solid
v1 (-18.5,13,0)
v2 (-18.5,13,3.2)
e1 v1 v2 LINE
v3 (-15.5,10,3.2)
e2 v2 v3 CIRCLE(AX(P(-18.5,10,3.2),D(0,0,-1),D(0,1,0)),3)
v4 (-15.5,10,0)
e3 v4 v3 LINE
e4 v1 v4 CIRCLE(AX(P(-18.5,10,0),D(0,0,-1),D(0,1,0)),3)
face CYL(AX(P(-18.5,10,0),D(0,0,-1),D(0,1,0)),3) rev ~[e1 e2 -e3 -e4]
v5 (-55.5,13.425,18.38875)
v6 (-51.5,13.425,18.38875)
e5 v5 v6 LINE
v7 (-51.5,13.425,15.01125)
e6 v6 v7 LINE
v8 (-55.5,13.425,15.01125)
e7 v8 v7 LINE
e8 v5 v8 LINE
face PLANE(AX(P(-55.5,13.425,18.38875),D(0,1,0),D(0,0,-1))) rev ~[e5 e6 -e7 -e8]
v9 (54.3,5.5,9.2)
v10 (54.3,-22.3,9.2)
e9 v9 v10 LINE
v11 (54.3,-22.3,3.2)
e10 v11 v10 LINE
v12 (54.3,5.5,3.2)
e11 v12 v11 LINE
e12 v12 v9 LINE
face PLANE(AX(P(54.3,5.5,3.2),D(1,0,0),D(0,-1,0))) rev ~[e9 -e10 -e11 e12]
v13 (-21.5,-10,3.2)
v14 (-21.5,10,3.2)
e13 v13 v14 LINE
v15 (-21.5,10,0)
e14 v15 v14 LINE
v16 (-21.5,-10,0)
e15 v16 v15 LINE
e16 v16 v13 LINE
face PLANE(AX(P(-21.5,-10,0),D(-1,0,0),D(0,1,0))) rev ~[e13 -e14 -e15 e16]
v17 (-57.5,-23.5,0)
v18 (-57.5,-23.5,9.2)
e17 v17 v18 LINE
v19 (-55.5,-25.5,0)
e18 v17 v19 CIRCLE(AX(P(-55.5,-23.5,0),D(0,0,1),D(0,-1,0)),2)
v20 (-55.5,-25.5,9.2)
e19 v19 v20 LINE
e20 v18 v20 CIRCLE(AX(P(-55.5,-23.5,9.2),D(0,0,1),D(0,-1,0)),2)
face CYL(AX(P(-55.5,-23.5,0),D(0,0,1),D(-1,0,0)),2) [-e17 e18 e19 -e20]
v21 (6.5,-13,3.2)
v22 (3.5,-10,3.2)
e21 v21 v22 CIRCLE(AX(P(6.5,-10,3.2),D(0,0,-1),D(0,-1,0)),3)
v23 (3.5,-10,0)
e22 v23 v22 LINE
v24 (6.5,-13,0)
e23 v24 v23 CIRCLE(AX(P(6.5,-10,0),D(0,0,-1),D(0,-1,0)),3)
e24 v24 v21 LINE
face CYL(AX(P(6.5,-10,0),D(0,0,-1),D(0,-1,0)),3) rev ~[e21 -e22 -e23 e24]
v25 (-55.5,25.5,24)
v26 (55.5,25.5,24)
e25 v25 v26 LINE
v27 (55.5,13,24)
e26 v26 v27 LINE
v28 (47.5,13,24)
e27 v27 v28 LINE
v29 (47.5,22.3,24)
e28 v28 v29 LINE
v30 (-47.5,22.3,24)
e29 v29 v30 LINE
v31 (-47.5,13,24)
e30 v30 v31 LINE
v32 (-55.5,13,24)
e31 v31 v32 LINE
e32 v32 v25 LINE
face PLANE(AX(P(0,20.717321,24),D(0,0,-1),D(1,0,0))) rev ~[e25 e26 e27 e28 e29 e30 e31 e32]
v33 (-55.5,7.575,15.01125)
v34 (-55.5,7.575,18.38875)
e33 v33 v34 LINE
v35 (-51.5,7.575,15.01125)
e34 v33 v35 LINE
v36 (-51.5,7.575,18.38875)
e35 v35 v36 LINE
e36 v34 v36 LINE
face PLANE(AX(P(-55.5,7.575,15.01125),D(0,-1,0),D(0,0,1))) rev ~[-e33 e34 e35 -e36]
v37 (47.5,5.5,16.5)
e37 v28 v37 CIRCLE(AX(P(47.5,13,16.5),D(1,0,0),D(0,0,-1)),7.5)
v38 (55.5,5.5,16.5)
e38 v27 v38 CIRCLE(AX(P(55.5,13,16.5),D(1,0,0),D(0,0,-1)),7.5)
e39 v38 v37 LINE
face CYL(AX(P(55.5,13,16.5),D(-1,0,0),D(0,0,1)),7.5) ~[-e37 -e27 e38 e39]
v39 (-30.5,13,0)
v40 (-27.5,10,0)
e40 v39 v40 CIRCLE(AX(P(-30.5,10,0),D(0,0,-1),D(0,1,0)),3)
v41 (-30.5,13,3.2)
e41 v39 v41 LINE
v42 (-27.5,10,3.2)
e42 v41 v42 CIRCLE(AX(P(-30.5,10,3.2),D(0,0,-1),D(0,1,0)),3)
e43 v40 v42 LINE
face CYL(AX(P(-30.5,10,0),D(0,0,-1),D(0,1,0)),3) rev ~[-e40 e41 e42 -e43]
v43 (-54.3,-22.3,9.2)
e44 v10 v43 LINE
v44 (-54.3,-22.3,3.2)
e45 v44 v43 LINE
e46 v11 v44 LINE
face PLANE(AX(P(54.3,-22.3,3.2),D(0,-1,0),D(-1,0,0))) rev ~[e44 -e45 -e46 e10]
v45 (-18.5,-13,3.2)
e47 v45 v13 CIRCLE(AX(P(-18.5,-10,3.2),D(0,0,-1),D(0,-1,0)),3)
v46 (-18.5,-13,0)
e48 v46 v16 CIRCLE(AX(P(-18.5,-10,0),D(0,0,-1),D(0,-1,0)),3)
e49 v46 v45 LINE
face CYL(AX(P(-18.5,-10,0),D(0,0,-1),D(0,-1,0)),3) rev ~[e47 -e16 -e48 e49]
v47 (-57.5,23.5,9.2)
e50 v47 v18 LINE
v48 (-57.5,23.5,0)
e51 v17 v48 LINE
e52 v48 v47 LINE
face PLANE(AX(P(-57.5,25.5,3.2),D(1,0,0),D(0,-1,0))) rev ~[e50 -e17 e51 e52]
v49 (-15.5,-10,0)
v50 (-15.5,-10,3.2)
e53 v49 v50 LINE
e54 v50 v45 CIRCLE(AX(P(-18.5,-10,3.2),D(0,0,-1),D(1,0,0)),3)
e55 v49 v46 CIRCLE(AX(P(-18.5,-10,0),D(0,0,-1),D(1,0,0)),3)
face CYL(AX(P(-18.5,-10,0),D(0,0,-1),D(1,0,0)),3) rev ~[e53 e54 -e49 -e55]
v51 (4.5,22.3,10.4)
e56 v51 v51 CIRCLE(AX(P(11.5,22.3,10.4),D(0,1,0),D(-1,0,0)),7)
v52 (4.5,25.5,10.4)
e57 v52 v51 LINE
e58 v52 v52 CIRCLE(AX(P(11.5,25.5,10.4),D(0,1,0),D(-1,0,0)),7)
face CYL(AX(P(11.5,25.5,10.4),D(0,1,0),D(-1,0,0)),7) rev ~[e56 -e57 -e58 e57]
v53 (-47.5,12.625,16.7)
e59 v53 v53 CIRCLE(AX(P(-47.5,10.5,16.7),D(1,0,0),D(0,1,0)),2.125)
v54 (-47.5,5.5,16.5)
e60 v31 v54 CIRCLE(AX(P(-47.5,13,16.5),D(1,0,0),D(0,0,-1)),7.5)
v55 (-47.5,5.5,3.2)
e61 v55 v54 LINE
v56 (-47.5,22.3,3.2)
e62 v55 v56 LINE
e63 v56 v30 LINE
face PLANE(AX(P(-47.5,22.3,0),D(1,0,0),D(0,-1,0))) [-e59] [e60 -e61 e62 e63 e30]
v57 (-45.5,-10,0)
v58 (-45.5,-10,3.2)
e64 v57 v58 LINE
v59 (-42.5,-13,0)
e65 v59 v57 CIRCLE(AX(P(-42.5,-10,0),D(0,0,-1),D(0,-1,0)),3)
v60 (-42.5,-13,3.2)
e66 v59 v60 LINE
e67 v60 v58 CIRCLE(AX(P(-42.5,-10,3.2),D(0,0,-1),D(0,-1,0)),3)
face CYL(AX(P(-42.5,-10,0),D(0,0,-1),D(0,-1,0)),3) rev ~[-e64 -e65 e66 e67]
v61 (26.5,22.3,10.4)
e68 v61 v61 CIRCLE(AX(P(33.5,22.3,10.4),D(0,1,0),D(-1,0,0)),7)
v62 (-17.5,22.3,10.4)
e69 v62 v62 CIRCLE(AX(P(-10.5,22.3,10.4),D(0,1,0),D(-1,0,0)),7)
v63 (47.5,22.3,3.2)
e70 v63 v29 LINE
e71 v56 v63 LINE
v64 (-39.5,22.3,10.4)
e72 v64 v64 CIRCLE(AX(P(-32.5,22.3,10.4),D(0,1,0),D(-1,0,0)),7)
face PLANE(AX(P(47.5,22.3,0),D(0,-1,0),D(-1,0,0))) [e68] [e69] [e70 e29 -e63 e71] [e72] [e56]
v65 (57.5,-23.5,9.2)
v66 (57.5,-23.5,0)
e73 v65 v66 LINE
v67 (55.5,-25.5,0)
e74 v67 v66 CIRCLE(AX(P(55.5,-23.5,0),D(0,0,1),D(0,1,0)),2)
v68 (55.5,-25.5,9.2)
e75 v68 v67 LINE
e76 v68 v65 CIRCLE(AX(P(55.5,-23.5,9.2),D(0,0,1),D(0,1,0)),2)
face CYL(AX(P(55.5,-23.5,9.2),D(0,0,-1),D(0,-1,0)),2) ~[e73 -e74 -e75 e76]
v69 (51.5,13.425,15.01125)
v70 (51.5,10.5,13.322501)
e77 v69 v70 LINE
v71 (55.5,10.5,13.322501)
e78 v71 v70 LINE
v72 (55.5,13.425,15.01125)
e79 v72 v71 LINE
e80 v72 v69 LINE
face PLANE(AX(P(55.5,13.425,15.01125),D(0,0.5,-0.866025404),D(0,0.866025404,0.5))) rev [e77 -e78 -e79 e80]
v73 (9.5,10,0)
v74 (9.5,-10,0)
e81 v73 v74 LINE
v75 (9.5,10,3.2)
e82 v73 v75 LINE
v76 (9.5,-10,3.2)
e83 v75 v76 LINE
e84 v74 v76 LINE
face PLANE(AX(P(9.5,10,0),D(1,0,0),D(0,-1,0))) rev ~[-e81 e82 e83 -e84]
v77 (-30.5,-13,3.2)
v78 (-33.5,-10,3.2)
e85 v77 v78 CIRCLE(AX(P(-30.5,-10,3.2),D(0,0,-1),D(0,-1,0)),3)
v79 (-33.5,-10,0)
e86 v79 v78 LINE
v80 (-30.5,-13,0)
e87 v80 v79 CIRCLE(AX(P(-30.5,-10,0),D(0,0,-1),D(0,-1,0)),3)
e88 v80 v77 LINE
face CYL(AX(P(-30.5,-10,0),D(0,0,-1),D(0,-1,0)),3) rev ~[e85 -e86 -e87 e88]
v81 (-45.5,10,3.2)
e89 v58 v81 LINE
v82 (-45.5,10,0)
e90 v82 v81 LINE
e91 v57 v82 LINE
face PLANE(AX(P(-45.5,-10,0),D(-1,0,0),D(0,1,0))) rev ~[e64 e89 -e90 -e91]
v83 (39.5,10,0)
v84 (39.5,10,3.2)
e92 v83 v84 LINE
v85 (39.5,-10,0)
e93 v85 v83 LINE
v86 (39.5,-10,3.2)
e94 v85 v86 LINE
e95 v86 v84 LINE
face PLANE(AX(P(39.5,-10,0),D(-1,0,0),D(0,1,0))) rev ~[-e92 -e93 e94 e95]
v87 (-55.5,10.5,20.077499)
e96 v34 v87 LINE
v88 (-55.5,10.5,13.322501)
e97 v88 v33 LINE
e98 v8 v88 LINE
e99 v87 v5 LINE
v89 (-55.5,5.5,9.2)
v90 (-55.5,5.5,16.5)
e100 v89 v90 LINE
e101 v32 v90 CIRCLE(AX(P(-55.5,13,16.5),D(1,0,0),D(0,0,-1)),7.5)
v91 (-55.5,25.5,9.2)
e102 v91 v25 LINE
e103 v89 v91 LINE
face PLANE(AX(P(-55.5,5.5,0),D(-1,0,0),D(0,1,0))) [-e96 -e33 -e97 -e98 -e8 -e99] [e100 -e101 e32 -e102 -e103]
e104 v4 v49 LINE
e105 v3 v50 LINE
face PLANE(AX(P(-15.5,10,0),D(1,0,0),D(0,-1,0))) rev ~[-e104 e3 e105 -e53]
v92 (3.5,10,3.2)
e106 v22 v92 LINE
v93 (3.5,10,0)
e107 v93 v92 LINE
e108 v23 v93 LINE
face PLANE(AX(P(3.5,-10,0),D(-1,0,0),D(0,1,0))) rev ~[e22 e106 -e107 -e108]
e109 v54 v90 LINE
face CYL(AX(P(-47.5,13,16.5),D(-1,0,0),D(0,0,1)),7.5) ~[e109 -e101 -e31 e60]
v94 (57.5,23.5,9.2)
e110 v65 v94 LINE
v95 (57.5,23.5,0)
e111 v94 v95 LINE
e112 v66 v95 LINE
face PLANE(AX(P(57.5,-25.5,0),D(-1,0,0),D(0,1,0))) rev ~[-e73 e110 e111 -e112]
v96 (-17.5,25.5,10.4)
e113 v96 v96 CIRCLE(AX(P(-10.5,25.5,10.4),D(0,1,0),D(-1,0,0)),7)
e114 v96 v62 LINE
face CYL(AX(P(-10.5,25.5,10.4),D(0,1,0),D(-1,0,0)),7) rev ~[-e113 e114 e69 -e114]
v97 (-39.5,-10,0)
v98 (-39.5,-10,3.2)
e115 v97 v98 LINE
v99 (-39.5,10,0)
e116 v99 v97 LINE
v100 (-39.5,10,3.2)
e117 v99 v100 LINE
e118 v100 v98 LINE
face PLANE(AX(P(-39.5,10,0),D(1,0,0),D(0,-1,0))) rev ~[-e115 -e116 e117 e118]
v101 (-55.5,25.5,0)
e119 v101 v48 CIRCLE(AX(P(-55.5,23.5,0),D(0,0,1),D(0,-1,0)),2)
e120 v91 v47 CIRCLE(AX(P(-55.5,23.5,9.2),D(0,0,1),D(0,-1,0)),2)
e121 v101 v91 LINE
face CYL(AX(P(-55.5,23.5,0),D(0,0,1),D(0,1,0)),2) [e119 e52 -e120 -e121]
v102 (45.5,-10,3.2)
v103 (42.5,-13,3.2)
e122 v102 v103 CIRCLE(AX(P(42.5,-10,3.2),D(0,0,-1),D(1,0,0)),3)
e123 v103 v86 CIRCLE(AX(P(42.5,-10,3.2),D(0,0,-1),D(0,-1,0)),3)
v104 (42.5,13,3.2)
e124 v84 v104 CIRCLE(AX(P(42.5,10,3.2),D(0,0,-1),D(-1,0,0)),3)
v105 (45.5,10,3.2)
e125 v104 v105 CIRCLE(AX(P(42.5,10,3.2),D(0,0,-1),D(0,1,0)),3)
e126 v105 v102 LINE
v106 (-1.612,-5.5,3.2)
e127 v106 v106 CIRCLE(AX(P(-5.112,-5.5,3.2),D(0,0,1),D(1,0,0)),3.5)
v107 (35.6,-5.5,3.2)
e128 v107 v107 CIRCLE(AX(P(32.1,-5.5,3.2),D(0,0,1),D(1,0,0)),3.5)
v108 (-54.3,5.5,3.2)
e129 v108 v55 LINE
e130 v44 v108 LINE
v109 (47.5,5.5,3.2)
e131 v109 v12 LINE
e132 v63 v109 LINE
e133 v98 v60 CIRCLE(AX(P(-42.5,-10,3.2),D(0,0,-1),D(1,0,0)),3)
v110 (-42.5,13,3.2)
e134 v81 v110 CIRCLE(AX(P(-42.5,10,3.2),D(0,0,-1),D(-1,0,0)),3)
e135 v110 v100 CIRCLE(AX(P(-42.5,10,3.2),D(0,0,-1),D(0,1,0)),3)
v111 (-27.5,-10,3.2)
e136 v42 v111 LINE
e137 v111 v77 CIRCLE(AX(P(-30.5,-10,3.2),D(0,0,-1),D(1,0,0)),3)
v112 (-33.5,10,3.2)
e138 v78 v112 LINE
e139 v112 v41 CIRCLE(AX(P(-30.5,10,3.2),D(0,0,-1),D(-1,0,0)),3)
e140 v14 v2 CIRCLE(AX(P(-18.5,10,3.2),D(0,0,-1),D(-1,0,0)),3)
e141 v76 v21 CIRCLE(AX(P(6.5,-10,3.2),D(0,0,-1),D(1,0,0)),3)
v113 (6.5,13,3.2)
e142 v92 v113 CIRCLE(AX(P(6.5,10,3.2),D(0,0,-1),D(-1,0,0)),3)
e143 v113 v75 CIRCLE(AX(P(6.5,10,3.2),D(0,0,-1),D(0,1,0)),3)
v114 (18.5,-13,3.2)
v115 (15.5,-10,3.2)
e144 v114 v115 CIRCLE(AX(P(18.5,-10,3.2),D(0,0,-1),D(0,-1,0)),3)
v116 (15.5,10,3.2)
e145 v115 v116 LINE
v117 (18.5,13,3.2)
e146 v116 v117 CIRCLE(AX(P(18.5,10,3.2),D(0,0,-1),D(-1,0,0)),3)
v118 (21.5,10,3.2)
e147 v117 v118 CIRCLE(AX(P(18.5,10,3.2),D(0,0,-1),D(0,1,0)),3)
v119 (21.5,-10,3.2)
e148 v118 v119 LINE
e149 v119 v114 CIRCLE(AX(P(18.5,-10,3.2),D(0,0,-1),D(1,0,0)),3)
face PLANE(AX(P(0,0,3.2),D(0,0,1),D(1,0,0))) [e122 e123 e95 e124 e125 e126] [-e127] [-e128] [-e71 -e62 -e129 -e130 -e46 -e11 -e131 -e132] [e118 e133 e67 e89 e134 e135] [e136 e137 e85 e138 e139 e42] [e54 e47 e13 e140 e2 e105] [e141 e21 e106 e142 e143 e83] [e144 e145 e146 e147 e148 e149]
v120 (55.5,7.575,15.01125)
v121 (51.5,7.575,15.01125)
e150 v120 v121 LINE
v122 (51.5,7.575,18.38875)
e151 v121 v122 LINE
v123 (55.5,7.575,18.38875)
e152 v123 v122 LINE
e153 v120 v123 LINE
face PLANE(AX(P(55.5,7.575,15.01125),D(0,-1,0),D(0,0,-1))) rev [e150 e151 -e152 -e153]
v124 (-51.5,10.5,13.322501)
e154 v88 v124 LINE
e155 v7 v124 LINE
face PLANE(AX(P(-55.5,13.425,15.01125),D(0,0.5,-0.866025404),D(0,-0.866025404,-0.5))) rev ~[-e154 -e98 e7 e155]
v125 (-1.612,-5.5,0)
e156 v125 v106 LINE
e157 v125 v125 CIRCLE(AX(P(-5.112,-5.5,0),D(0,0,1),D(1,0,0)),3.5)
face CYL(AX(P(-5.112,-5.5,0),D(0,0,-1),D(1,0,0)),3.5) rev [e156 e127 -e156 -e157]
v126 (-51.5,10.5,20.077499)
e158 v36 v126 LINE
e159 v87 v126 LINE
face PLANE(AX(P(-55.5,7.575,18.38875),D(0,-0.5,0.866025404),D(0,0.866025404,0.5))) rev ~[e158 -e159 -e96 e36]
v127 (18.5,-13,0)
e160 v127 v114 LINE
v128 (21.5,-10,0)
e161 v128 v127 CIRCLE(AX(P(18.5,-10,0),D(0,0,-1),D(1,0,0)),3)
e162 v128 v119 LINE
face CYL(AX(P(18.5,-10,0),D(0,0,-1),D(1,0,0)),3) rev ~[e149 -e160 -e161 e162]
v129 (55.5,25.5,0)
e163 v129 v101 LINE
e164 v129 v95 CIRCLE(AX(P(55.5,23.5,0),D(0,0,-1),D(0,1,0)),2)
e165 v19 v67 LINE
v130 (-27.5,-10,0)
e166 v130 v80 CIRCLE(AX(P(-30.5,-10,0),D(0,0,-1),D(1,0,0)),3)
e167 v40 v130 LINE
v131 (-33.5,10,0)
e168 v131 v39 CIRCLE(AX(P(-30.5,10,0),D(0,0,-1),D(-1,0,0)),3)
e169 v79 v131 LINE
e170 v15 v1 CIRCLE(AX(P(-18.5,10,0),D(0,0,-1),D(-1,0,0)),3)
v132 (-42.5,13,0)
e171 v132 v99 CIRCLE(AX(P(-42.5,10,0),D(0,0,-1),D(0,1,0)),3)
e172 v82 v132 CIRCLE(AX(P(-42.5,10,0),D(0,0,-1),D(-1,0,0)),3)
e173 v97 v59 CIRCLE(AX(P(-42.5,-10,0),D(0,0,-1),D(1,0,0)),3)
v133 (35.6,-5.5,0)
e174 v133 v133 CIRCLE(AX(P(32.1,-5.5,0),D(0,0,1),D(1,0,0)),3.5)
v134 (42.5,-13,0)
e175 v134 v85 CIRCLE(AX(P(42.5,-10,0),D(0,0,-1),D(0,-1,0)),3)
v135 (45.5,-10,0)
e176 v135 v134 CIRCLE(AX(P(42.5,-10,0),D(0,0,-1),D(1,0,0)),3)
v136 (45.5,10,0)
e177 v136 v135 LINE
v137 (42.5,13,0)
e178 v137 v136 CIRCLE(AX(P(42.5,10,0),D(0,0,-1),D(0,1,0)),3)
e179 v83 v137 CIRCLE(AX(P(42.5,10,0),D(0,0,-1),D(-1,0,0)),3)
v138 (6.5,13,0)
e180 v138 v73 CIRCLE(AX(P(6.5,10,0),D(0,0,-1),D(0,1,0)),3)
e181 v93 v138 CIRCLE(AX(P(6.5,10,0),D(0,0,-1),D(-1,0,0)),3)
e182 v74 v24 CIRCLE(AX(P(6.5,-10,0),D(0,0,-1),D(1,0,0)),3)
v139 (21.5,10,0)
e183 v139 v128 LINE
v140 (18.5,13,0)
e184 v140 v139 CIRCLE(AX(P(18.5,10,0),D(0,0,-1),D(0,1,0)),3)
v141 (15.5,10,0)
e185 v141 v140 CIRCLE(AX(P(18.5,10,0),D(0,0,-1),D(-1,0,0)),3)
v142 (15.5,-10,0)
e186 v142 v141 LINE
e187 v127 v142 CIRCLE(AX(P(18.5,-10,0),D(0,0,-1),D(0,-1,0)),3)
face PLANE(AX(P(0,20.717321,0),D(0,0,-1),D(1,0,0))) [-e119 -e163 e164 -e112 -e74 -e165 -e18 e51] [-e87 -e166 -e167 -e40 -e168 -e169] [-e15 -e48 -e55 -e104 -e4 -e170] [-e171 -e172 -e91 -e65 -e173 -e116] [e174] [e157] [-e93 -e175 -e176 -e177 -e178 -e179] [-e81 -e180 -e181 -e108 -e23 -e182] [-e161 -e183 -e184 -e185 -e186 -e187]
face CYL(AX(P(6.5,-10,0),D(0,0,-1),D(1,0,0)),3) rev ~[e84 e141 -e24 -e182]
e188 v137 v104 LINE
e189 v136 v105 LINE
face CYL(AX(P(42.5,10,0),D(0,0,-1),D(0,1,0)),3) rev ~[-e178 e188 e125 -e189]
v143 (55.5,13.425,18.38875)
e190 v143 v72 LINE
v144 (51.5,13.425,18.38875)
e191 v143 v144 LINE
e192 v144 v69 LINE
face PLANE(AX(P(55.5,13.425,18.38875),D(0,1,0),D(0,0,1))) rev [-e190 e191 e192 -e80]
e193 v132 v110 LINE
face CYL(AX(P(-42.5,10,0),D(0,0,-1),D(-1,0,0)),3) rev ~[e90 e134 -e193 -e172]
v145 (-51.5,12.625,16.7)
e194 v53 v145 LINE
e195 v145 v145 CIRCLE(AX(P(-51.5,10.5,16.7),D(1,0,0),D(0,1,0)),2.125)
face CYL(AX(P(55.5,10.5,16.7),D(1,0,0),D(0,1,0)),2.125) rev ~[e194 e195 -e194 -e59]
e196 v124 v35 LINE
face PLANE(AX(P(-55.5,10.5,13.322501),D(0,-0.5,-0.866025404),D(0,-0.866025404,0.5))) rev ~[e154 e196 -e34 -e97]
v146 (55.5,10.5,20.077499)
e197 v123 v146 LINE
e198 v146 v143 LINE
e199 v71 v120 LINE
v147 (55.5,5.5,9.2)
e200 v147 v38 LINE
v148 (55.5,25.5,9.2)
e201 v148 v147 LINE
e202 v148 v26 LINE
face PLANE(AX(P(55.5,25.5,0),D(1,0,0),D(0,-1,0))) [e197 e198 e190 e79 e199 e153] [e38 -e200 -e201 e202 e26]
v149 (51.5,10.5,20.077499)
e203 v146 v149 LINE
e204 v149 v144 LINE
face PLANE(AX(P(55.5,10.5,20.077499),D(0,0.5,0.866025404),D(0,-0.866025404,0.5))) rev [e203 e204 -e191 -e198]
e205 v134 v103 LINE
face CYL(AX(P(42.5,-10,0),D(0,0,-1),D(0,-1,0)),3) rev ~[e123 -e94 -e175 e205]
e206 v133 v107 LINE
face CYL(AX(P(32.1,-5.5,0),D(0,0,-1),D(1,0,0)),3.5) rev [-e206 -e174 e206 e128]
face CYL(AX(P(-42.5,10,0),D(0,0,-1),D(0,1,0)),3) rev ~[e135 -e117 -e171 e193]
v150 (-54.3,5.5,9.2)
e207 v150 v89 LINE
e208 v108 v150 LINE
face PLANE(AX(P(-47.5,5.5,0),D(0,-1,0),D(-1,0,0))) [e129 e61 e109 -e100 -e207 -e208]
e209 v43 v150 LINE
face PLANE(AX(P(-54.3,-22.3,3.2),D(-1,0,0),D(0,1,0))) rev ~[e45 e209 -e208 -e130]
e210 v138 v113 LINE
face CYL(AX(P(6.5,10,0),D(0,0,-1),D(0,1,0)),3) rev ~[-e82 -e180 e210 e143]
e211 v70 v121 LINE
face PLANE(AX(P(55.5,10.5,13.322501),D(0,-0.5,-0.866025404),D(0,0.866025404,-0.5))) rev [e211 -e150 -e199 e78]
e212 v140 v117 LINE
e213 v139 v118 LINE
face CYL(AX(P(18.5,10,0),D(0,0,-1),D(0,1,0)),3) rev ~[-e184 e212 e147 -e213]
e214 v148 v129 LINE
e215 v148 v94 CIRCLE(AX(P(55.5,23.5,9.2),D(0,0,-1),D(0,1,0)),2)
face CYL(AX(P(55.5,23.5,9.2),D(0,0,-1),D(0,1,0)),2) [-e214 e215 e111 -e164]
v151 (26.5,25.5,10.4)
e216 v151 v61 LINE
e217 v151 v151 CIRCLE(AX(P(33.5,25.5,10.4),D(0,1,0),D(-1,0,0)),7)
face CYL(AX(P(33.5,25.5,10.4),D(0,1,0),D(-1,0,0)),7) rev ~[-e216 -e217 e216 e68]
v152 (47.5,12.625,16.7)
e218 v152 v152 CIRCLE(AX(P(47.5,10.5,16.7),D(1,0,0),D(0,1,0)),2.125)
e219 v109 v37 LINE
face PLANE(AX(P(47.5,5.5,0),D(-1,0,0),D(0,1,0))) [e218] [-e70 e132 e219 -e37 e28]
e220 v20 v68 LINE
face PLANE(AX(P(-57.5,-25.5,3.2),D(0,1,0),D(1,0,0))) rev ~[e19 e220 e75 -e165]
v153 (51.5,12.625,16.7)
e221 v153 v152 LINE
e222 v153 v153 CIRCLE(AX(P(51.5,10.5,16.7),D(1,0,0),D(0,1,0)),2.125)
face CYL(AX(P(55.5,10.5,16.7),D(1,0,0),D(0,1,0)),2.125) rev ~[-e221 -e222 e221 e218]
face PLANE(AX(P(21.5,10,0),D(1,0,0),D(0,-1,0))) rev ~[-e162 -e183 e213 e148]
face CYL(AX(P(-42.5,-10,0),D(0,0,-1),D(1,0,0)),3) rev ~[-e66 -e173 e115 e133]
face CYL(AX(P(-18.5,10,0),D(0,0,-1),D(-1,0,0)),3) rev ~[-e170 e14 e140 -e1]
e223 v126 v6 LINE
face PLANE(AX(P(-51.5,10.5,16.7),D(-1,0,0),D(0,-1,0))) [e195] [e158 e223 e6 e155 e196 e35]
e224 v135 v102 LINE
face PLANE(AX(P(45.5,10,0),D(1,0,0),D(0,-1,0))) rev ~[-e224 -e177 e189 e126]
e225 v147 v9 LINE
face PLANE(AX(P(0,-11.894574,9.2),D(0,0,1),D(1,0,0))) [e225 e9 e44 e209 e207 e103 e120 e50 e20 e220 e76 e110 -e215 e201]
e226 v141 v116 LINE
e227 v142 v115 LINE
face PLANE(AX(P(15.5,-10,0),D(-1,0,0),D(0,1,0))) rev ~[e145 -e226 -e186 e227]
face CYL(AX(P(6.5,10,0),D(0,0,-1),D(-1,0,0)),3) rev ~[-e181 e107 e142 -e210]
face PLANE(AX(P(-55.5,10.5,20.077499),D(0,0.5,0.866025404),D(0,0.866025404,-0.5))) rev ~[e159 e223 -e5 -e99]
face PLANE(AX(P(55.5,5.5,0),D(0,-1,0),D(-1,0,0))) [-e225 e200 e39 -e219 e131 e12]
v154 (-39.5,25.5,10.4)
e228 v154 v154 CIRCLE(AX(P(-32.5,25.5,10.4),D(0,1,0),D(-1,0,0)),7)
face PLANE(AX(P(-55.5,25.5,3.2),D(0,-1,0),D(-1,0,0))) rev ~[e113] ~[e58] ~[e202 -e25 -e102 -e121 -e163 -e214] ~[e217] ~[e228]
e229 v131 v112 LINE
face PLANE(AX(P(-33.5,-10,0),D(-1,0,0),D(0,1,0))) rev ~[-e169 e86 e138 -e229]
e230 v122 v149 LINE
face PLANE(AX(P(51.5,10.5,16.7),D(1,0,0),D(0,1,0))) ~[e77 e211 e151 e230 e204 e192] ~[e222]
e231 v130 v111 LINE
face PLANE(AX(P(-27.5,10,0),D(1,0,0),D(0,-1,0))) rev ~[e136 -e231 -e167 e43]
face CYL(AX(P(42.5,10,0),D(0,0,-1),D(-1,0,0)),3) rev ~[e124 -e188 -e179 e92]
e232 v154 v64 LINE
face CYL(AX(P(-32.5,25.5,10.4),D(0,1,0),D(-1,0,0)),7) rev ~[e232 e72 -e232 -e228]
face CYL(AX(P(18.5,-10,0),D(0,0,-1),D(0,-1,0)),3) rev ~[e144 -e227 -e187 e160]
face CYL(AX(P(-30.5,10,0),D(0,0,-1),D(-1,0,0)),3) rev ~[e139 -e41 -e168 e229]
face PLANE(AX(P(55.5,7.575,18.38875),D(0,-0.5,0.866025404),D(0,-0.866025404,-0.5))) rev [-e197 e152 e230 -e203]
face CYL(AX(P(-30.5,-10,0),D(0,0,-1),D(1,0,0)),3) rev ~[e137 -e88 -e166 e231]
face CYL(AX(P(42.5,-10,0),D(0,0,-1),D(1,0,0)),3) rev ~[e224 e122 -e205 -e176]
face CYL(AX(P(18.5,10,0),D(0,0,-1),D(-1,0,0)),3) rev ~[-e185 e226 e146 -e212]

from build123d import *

# Parameters (mm, degrees)
F0_W      = 115
F0_H      = 51
F0_R      = 3.5
F1_DEPTH  = 3.2
F3_DEPTH  = 24
F5_DEPTH  = 6
F6_R      = 2.125
F7_DEPTH  = 113.001
F8_R      = 7.5
F9_R      = 2
F10_R     = 7
F11_DEPTH = 5
F13_DEPTH = 4


# Not quite as in the source:
# - a pattern or mirror of a feature is missing from the dataset's text; its kind, count and spacing are read off the source's solid


with BuildPart() as f1:
    # F0 (on Top) → F1 (new body)
    with BuildSketch(Plane.XY):
        Rectangle(F0_W, F0_H)
        with BuildLine():
            Line((-39.5, 10), (-39.5, -10))
            ThreePointArc((-39.5, -10), (-40.3786796564, -12.1213203436), (-42.5, -13))
            ThreePointArc((-42.5, -13), (-44.6213203436, -12.1213203436), (-45.5, -10))
            Line((-45.5, -10), (-45.5, 10))
            ThreePointArc((-45.5, 10), (-44.6213203436, 12.1213203436), (-42.5, 13))
            ThreePointArc((-42.5, 13), (-40.3786796564, 12.1213203436), (-39.5, 10))
        make_face(mode=Mode.SUBTRACT)
        with Locations((-5.112, -5.5)):
            Circle(F0_R, mode=Mode.SUBTRACT)
        with Locations((32.1, -5.5)):
            Circle(F0_R, mode=Mode.SUBTRACT)
        with BuildLine():
            Line((-27.5, 10), (-27.5, -10))
            ThreePointArc((-27.5, -10), (-28.3786796564, -12.1213203436), (-30.5, -13))
            ThreePointArc((-30.5, -13), (-32.6213203436, -12.1213203436), (-33.5, -10))
            Line((-33.5, -10), (-33.5, 10))
            ThreePointArc((-33.5, 10), (-32.6213203436, 12.1213203436), (-30.5, 13))
            ThreePointArc((-30.5, 13), (-28.3786796564, 12.1213203436), (-27.5, 10))
        make_face(mode=Mode.SUBTRACT)
        with BuildLine():
            Line((-15.5, 10), (-15.5, -10))
            ThreePointArc((-15.5, -10), (-16.3786796564, -12.1213203436), (-18.5, -13))
            ThreePointArc((-18.5, -13), (-20.6213203436, -12.1213203436), (-21.5, -10))
            Line((-21.5, -10), (-21.5, 10))
            ThreePointArc((-21.5, 10), (-20.6213203436, 12.1213203436), (-18.5, 13))
            ThreePointArc((-18.5, 13), (-16.3786796564, 12.1213203436), (-15.5, 10))
        make_face(mode=Mode.SUBTRACT)
        with BuildLine():
            Line((9.5, 10), (9.5, -10))
            ThreePointArc((9.5, -10), (8.6213203436, -12.1213203436), (6.5, -13))
            ThreePointArc((6.5, -13), (4.3786796564, -12.1213203436), (3.5, -10))
            Line((3.5, -10), (3.5, 10))
            ThreePointArc((3.5, 10), (4.3786796564, 12.1213203436), (6.5, 13))
            ThreePointArc((6.5, 13), (8.6213203436, 12.1213203436), (9.5, 10))
        make_face(mode=Mode.SUBTRACT)
        with BuildLine():
            Line((21.5, 10), (21.5, -10))
            ThreePointArc((21.5, -10), (20.6213203436, -12.1213203436), (18.5, -13))
            ThreePointArc((18.5, -13), (16.3786796564, -12.1213203436), (15.5, -10))
            Line((15.5, -10), (15.5, 10))
            ThreePointArc((15.5, 10), (16.3786796564, 12.1213203436), (18.5, 13))
            ThreePointArc((18.5, 13), (20.6213203436, 12.1213203436), (21.5, 10))
        make_face(mode=Mode.SUBTRACT)
        with BuildLine():
            Line((45.5, 10), (45.5, -10))
            ThreePointArc((45.5, -10), (44.6213203436, -12.1213203436), (42.5, -13))
            ThreePointArc((42.5, -13), (40.3786796564, -12.1213203436), (39.5, -10))
            Line((39.5, -10), (39.5, 10))
            ThreePointArc((39.5, 10), (40.3786796564, 12.1213203436), (42.5, 13))
            ThreePointArc((42.5, 13), (44.6213203436, 12.1213203436), (45.5, 10))
        make_face(mode=Mode.SUBTRACT)
    extrude(amount=F1_DEPTH)

    # F2 (on face) → F3 (join)
    with BuildSketch(Plane(origin=(0, 0, 0), x_dir=(1, 0, 0), z_dir=(0, 0, -1))):
        Polygon((-47.5, -5.5), (-55.5, -5.5), (-55.5, -25.5), (55.5, -25.5), (55.5, -5.5), (47.5, -5.5), (47.5, -22.3), (-47.5, -22.3), align=None)
    extrude(amount=-F3_DEPTH)

    # F4 (on face) → F5 (join)
    with BuildSketch(Plane.XY.offset(3.2)):
        Polygon((-55.5, 5.5), (-55.5, 25.5), (-57.5, 25.5), (-57.5, -25.5), (57.5, -25.5), (57.5, 25.5), (55.5, 25.5), (55.5, 5.5), (54.3, 5.5), (54.3, -22.3), (-54.3, -22.3), (-54.3, 5.5), align=None)
    extrude(amount=F5_DEPTH)

    # F6 (on face) → F7 (cut, through all)
    with BuildSketch(Plane.YZ.offset(55.5)):
        with Locations((10.5, 16.7)):
            Circle(F6_R)
    extrude(amount=-F7_DEPTH, mode=Mode.SUBTRACT)

    # F8
    f8_edges = [f1.edges().sort_by_distance(p)[0] for p in [
        (51.5, 5.5, 24),
        (-51.5, 5.5, 24),
    ]]
    fillet(f8_edges, radius=F8_R)

    # F9
    f9_edges = [f1.edges().sort_by_distance(p)[0] for p in [
        (-57.5, -25.5, 4.6),
        (57.5, -25.5, 4.6),
        (57.5, 25.5, 4.6),
        (-57.5, 25.5, 4.6),
    ]]
    fillet(f9_edges, radius=F9_R)

    # F10 (on face) → F11 (cut)
    with BuildSketch(Plane(origin=(0, 25.5, 0), x_dir=(-1, 0, 0), z_dir=(0, 1, 0))):
        with Locations((-33.5, 10.4)):
            Circle(F10_R)
        with Locations((-11.5, 10.4)):
            Circle(F10_R)
        with Locations((10.5, 10.4)):
            Circle(F10_R)
        with Locations((32.5, 10.4)):
            Circle(F10_R)
    extrude(amount=-F11_DEPTH, mode=Mode.SUBTRACT)

    # F12 (on face) → F13 (cut)
    with BuildSketch(Plane(origin=(-55.5, 0, 0), x_dir=(0, -1, 0), z_dir=(-1, 0, 0))):
        Polygon((-7.575, 15.0112504626), (-7.575, 18.3887495374), (-10.5, 20.0774990748), (-13.425, 18.3887495374), (-13.425, 15.0112504626), (-10.5, 13.3225009252), align=None)
    f13 = extrude(amount=-F13_DEPTH, mode=Mode.SUBTRACT)

    # F13_copies: F13 across plane
    add(f13.mirror(Plane(origin=(0, 0, 0), x_dir=(0, 0, 1), z_dir=(1, 0, 0))), mode=Mode.SUBTRACT)


solid = f1.part
